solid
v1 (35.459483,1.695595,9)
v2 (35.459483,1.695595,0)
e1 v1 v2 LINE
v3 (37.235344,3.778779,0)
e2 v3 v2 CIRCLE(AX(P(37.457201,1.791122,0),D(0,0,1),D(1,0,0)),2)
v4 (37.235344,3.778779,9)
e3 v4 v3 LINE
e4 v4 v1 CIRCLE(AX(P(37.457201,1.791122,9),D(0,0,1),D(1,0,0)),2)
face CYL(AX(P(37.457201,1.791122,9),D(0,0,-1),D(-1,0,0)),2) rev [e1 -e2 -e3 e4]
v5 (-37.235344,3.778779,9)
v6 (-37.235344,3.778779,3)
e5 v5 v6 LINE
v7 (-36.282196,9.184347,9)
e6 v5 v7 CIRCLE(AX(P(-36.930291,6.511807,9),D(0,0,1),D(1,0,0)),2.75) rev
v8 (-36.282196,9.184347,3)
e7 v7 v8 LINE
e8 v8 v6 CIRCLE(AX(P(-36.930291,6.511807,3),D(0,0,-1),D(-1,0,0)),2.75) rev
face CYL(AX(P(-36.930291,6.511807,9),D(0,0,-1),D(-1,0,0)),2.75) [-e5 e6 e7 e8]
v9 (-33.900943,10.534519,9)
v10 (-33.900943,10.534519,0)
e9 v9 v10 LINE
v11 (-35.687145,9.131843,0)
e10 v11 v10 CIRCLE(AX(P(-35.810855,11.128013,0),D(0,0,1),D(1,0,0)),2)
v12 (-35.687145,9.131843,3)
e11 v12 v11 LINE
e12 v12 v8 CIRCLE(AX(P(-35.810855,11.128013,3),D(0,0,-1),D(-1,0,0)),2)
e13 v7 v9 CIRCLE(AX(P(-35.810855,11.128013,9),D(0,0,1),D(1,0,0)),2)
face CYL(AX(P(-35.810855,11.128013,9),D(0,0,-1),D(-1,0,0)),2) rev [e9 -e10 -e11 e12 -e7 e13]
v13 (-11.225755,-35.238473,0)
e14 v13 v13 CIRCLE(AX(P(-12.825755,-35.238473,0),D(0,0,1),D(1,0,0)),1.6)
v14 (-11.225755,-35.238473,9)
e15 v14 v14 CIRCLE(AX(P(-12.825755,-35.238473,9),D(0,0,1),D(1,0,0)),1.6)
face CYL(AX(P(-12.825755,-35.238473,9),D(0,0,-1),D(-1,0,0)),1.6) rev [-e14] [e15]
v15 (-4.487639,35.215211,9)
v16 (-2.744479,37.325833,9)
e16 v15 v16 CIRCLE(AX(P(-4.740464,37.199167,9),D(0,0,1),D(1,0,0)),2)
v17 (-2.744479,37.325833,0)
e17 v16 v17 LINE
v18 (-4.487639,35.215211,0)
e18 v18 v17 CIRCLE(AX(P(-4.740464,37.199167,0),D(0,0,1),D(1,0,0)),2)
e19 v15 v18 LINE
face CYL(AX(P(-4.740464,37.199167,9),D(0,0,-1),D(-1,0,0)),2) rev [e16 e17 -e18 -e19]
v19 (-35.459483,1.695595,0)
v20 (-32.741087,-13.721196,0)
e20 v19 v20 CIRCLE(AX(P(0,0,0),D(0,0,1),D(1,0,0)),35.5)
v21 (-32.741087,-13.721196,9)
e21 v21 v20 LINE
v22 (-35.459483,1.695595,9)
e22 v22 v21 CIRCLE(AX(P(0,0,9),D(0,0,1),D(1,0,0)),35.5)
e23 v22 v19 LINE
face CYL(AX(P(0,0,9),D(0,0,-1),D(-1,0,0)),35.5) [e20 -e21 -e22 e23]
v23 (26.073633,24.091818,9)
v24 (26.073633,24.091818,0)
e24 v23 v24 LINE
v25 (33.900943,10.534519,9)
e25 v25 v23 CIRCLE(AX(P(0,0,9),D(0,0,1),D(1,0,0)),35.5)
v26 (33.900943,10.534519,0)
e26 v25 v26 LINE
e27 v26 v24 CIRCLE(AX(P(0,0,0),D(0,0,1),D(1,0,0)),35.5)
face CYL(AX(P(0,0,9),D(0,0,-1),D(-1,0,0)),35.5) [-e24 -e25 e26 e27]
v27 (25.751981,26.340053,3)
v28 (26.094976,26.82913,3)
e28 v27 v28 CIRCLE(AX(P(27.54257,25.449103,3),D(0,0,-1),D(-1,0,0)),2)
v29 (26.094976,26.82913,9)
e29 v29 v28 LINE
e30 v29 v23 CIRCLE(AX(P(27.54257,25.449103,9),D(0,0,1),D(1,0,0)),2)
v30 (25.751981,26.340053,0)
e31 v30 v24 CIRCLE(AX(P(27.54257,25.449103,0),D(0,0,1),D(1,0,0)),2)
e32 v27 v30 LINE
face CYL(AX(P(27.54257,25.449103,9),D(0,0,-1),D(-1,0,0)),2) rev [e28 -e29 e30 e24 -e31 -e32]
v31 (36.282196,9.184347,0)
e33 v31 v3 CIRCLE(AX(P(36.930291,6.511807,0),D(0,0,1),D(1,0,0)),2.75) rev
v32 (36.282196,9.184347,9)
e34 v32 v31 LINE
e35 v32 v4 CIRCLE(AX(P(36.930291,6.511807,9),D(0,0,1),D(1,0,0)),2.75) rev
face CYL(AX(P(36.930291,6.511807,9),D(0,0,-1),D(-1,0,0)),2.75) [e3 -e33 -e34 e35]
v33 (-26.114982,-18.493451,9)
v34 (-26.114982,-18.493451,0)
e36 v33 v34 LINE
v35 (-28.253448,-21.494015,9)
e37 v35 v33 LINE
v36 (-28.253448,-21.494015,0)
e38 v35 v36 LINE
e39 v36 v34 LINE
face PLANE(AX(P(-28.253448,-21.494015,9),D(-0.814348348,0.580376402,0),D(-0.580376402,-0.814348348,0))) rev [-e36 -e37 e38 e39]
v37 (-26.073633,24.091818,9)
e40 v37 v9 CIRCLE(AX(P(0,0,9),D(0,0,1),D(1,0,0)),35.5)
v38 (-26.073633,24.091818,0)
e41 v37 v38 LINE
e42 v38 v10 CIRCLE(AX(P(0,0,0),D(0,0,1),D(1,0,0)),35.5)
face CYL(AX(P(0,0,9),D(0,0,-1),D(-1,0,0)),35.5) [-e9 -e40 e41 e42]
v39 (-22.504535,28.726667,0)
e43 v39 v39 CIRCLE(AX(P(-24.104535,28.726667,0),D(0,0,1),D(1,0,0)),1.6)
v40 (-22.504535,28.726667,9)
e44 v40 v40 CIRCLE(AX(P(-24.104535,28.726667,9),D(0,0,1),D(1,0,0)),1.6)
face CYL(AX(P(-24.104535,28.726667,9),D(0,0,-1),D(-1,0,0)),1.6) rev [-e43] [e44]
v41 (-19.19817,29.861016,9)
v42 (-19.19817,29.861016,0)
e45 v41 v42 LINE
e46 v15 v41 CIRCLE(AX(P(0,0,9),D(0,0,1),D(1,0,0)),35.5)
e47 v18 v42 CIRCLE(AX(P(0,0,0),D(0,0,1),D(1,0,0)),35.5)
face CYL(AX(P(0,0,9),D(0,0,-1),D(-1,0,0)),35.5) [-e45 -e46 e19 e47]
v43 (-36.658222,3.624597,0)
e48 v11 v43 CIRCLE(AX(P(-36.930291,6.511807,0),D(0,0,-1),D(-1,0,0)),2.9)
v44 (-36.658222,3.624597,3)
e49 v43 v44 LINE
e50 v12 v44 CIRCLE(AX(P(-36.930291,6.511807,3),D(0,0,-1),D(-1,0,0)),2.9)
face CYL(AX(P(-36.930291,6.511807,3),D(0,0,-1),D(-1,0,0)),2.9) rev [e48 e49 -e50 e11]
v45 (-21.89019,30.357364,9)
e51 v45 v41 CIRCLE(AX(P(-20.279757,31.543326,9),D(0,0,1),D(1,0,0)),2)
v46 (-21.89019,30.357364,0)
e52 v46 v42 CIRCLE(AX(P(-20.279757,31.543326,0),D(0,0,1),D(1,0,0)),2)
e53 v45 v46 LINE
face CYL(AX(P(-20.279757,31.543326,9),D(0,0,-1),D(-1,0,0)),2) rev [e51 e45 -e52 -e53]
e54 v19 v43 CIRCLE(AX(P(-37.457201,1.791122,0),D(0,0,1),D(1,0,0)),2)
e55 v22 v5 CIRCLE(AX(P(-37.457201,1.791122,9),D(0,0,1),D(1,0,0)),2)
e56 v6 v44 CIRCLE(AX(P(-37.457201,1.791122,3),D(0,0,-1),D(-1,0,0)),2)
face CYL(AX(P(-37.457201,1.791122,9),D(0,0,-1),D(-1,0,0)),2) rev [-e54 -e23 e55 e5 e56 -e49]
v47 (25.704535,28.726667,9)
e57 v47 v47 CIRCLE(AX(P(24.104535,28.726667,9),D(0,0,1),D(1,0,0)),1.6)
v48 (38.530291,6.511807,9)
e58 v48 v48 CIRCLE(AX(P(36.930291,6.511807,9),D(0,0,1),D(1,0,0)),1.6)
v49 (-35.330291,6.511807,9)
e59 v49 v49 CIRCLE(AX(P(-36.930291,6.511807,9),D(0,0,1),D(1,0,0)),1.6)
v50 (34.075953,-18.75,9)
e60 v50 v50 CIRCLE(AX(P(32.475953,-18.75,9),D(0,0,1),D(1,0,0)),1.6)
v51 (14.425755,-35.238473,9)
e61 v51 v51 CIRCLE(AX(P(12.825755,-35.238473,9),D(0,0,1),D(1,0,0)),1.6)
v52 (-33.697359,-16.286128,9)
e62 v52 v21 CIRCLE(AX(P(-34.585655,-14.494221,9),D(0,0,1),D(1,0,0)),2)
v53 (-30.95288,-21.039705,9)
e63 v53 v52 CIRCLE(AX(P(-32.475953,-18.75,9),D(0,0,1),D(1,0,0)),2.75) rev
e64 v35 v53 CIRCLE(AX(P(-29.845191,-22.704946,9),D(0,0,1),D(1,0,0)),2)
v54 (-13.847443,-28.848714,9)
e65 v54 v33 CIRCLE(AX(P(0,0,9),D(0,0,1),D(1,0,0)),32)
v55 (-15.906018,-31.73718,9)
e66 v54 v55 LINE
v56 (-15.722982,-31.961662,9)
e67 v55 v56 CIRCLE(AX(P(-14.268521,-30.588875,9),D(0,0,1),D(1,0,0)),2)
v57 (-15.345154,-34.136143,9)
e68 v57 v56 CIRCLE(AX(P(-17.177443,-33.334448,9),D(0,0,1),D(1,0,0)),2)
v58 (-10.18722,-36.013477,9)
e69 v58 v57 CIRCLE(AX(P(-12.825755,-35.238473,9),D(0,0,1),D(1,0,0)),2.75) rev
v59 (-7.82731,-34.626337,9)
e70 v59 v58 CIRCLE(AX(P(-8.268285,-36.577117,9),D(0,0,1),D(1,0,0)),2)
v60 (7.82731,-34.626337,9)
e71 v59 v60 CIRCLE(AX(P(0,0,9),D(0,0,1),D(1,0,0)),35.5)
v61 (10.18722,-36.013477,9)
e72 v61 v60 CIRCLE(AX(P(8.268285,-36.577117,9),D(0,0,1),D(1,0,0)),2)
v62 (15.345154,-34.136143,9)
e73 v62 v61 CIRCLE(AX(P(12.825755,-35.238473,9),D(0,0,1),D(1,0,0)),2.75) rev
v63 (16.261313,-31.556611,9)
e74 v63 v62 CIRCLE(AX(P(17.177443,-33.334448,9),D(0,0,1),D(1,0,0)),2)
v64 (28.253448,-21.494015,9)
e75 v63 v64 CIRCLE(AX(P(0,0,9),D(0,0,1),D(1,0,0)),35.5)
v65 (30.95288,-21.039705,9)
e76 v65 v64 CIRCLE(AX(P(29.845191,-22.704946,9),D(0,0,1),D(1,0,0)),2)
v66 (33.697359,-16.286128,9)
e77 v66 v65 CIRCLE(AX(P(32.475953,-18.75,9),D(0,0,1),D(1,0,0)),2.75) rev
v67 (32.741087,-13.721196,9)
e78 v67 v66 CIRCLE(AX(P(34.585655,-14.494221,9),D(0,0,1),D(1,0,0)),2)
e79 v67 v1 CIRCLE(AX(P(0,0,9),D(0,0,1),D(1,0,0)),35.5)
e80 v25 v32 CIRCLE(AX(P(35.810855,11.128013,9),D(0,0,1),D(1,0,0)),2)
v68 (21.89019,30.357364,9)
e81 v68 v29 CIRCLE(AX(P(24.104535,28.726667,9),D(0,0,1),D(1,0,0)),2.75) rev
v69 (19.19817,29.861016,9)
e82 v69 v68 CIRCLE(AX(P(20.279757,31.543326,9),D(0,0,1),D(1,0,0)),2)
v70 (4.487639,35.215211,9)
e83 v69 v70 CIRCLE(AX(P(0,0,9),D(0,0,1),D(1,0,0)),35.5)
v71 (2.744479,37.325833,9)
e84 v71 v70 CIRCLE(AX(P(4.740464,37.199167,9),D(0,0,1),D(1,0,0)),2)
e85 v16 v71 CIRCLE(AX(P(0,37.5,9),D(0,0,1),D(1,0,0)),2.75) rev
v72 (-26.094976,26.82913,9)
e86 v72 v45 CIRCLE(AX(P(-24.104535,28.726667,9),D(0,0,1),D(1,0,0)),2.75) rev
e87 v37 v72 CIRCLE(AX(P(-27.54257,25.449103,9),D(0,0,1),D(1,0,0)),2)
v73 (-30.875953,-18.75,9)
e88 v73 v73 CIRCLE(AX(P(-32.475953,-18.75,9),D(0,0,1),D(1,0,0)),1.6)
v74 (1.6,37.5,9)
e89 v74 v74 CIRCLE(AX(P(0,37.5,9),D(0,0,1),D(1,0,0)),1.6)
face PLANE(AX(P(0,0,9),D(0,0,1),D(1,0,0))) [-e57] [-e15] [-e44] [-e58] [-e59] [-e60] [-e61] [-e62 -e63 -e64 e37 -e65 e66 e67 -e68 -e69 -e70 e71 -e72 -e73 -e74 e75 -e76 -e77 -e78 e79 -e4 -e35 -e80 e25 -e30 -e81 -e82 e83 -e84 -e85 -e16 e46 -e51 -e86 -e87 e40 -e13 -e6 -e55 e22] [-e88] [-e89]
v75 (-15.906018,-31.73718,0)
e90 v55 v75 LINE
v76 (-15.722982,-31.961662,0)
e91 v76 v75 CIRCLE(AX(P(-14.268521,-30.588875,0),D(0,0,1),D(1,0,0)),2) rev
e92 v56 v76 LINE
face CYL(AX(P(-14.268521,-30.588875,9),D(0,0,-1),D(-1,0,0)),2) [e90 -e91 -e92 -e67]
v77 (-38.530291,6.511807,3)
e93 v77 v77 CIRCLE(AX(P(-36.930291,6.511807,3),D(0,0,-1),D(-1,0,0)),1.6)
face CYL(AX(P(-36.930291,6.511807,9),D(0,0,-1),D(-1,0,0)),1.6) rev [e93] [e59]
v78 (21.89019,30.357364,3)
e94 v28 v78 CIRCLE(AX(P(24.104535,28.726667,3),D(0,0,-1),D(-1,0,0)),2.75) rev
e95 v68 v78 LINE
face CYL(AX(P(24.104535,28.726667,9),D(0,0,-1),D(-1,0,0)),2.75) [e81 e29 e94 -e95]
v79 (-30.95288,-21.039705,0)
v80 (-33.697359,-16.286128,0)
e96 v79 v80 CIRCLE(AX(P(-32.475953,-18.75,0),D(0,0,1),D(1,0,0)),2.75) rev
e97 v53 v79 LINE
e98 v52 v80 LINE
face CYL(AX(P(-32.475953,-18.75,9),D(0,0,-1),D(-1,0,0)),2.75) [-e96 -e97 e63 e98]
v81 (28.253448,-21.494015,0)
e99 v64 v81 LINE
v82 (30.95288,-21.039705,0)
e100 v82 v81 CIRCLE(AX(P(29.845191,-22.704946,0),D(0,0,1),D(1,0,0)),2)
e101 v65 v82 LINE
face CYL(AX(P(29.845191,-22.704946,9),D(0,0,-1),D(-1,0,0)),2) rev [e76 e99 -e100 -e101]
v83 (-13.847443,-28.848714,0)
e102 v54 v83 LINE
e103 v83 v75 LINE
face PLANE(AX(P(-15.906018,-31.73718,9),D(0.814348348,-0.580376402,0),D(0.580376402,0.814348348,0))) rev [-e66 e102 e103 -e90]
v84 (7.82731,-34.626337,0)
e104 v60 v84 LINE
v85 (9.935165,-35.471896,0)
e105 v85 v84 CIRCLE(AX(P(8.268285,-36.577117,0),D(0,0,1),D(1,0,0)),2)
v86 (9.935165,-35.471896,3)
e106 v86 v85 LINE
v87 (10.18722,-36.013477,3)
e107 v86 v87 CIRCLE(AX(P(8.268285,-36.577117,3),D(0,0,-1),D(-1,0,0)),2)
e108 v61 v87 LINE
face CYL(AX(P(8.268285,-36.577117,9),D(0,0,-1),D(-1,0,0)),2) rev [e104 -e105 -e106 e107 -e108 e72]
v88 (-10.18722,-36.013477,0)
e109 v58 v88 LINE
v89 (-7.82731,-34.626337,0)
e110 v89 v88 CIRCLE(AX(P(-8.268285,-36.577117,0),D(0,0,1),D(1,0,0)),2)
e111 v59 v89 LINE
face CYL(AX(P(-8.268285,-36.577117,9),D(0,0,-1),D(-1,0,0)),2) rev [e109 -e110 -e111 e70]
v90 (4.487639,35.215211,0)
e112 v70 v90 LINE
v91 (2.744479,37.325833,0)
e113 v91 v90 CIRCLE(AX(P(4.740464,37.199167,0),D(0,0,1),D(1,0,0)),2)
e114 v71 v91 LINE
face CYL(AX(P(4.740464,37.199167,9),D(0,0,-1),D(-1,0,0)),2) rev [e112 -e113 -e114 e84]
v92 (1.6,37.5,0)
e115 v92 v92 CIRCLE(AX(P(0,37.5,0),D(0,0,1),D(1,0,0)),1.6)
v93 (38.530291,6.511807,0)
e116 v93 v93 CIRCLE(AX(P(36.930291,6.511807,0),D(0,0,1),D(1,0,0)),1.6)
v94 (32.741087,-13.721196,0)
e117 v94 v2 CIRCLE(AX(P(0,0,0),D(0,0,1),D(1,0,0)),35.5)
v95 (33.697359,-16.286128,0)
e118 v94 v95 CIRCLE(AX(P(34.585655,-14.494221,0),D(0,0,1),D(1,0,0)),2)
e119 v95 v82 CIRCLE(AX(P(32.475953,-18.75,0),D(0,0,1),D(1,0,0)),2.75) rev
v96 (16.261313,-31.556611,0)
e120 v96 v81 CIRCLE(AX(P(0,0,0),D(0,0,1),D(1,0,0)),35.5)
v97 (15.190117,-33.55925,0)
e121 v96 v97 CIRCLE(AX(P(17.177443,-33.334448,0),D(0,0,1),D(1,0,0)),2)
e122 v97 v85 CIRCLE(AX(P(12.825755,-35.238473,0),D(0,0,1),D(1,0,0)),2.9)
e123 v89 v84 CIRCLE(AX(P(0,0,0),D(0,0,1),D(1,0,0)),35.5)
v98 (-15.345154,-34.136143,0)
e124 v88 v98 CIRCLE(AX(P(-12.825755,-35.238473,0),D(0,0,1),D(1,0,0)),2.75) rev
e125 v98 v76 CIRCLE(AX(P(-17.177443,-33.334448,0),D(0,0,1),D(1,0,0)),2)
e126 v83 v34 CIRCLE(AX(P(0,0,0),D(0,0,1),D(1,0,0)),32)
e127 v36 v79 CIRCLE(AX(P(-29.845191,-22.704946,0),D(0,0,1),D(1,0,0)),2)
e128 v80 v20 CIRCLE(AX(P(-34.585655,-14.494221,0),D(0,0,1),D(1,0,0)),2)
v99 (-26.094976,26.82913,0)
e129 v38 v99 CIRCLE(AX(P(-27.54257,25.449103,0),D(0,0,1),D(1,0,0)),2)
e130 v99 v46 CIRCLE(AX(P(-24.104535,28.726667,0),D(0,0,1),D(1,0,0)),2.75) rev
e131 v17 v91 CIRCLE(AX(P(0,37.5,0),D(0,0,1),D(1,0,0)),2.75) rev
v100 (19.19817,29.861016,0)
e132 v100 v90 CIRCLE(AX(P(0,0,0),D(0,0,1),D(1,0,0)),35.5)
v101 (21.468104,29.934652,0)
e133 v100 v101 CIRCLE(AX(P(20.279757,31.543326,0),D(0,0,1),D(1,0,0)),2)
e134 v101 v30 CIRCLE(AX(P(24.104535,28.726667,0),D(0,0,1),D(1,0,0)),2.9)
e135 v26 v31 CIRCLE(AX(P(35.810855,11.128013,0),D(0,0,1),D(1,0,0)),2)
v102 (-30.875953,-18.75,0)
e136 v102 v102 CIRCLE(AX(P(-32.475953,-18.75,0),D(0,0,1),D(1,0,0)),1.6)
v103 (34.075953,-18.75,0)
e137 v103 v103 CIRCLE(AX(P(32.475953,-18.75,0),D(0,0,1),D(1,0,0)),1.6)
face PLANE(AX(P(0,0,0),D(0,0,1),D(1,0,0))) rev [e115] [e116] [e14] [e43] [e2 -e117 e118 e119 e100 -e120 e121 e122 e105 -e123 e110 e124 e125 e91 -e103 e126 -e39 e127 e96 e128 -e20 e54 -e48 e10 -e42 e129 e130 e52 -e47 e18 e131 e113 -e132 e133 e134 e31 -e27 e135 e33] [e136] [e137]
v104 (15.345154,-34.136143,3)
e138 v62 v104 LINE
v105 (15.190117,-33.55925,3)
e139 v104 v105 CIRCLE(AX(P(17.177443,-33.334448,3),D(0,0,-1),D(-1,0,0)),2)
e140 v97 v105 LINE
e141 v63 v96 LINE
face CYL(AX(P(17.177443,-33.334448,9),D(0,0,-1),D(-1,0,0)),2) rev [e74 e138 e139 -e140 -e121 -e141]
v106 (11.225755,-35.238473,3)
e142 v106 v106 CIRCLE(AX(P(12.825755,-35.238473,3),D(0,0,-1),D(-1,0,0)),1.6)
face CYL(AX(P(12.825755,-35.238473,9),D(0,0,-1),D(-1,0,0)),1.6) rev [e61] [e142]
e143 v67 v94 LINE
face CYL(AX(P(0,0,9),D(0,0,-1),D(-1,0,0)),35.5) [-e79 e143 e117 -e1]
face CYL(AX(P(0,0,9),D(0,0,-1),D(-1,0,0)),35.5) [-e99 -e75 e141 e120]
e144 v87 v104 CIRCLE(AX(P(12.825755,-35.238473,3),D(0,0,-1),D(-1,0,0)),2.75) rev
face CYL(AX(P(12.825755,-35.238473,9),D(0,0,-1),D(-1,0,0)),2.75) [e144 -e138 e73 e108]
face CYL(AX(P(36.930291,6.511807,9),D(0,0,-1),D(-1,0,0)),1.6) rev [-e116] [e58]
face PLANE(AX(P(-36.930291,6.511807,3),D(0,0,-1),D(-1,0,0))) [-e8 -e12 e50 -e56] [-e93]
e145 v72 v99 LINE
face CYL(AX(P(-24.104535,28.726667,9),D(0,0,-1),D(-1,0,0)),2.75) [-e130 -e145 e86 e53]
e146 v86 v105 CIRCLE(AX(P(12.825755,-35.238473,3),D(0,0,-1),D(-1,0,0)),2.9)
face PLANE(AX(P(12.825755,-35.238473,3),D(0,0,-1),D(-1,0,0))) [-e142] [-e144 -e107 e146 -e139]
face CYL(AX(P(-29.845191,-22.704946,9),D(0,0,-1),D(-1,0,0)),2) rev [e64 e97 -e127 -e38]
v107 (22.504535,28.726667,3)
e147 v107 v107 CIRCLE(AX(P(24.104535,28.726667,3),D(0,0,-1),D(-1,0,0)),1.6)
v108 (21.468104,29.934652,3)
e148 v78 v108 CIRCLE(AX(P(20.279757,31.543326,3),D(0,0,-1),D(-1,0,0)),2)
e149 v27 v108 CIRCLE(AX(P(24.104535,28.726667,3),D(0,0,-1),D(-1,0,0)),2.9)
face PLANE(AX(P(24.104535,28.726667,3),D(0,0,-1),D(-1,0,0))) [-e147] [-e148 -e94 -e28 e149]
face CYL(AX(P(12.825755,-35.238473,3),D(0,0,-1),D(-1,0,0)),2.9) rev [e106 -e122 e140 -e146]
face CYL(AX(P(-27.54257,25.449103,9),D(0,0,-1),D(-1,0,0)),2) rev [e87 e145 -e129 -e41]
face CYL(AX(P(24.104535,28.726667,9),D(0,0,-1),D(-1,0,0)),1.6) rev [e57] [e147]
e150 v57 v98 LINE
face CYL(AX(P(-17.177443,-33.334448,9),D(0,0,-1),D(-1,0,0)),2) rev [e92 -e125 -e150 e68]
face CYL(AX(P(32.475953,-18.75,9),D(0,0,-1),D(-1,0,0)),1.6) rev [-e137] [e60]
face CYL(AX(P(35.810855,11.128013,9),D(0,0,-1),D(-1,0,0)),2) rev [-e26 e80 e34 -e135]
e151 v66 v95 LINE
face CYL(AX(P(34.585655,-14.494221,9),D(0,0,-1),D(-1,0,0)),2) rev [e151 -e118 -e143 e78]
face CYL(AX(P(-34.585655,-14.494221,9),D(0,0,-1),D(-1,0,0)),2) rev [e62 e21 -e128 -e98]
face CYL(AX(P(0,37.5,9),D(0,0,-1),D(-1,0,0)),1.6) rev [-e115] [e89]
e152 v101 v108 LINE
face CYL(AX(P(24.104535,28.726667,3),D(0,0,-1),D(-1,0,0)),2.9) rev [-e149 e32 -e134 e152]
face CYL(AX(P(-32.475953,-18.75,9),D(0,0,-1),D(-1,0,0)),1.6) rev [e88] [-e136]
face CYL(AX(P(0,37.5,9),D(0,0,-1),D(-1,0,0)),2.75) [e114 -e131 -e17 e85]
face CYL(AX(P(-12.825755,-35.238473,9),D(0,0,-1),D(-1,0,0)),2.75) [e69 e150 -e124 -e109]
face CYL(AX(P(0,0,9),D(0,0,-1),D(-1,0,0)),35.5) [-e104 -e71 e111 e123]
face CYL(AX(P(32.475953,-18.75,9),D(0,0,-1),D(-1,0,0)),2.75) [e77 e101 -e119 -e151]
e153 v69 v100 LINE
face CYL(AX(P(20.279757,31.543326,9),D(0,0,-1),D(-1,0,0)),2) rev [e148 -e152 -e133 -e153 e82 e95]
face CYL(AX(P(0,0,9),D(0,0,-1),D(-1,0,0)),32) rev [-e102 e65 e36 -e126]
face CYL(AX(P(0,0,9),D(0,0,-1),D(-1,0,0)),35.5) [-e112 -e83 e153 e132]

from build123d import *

# Parameters (mm, degrees)
SKETCH_1_R          = 35.5
SKETCH_1_R_2        = 32
SKETCH_1_R_3        = 1.6
EXTRUDE_1_DEPTH     = 9
SKETCH_2_R          = 2.9
CUT_EXTRUDE_1_DEPTH = 3
CUT_EXTRUDE_3_DEPTH = 58.232752625
FILLET_START        = -1
FILLET_1_DEPTH      = 11


with BuildPart() as part:
    # 草图1 → 凸台-拉伸1 (new body)
    # profile 1 of 10: a face of its own
    with BuildSketch(Plane.XY):
        Circle(SKETCH_1_R)
        Circle(SKETCH_1_R_2, mode=Mode.SUBTRACT)
    # profile 2 of 10: a face of its own
    with BuildSketch(Plane.XY):
        with BuildLine():
            ThreePointArc((-26.073632516, 24.091817852), (-22.818960144, 27.194577731), (-19.198170234, 29.861015717))
            ThreePointArc((-19.198170234, 29.861015717), (-20.642400342, 29.576478726), (-21.890190162, 30.357364422))
            ThreePointArc((-21.890190162, 30.357364422), (-25.87220129, 30.833288836), (-26.094976213, 26.829129998))
            ThreePointArc((-26.094976213, 26.829129998), (-25.542630354, 25.46469753), (-26.073632516, 24.091817852))
        make_face()
        with Locations((-24.104535363, 28.726666617)):
            Circle(SKETCH_1_R_3, mode=Mode.SUBTRACT)
    # profile 3 of 10: a face of its own
    with BuildSketch(Plane.XY):
        with BuildLine():
            ThreePointArc((-4.48763929, 35.215211111), (0, 35.5), (4.48763929, 35.215211111))
            ThreePointArc((4.48763929, 35.215211111), (3.198397989, 35.925576349), (2.744479181, 37.325833333))
            ThreePointArc((2.744479181, 37.325833333), (0, 40.25), (-2.744479181, 37.325833333))
            ThreePointArc((-2.744479181, 37.325833333), (-3.198397989, 35.925576349), (-4.48763929, 35.215211111))
        make_face()
        with Locations((0, 37.5)):
            Circle(SKETCH_1_R_3, mode=Mode.SUBTRACT)
    # profile 4 of 10: a face of its own
    with BuildSketch(Plane.XY):
        with BuildLine():
            ThreePointArc((19.198170234, 29.861015717), (22.818960144, 27.194577731), (26.073632516, 24.091817852))
            ThreePointArc((26.073632516, 24.091817852), (25.542630354, 25.46469753), (26.094976213, 26.829129998))
            ThreePointArc((26.094976213, 26.829129998), (25.87220129, 30.833288836), (21.890190162, 30.357364422))
            ThreePointArc((21.890190162, 30.357364422), (20.642400342, 29.576478726), (19.198170234, 29.861015717))
        make_face()
        with Locations((24.104535363, 28.726666617)):
            Circle(SKETCH_1_R_3, mode=Mode.SUBTRACT)
    # profile 5 of 10: a face of its own
    with BuildSketch(Plane.XY):
        with BuildLine():
            ThreePointArc((33.900942541, 10.534519201), (34.960675232, 6.164510307), (35.459483311, 1.69559527))
            ThreePointArc((35.459483311, 1.69559527), (35.935182102, 3.088603728), (37.235343863, 3.778778563))
            ThreePointArc((37.235343863, 3.778778563), (39.638512059, 6.989339151), (36.282196246, 9.184347313))
            ThreePointArc((36.282196246, 9.184347313), (34.824390138, 9.388218001), (33.900942541, 10.534519201))
        make_face()
        with Locations((36.930290738, 6.511806663)):
            Circle(SKETCH_1_R_3, mode=Mode.SUBTRACT)
    # profile 6 of 10: a face of its own
    with BuildSketch(Plane.XY):
        with BuildLine():
            ThreePointArc((33.697359474, -16.286127976), (32.711660758, -15.192894265), (32.741087067, -13.721195927))
            ThreePointArc((32.741087067, -13.721195927), (30.743901834, -17.75), (28.253447777, -21.494015184))
            ThreePointArc((28.253447777, -21.494015184), (29.51326277, -20.732682084), (30.952880294, -21.039705357))
            ThreePointArc((30.952880294, -21.039705357), (34.857522502, -20.125), (33.697359474, -16.286127976))
        make_face()
        with Locations((32.475952642, -18.75)):
            Circle(SKETCH_1_R_3, mode=Mode.SUBTRACT)
    # profile 7 of 10: a face of its own
    with BuildSketch(Plane.XY):
        with BuildLine():
            ThreePointArc((15.3451537, -34.136142985), (15.29278176, -32.665082454), (16.261313077, -31.556610987))
            ThreePointArc((16.261313077, -31.556610987), (12.141715088, -33.359088038), (7.827310026, -34.626337054))
            ThreePointArc((7.827310026, -34.626337054), (9.281759784, -34.852915531), (10.187220033, -36.013477311))
            ThreePointArc((10.187220033, -36.013477311), (13.766310769, -37.822627987), (15.3451537, -34.136142985))
        make_face()
        with Locations((12.825755375, -35.238473279)):
            Circle(SKETCH_1_R_3, mode=Mode.SUBTRACT)
    # profile 8 of 10: a face of its own
    with BuildSketch(Plane.XY):
        with BuildLine():
            ThreePointArc((-10.187220033, -36.013477311), (-9.281759784, -34.852915531), (-7.827310026, -34.626337054))
            ThreePointArc((-7.827310026, -34.626337054), (-12.141715088, -33.359088038), (-16.261313077, -31.556610987))
            ThreePointArc((-16.261313077, -31.556610987), (-15.29278176, -32.665082454), (-15.3451537, -34.136142985))
            ThreePointArc((-15.3451537, -34.136142985), (-13.766310769, -37.822627987), (-10.187220033, -36.013477311))
        make_face()
        with Locations((-12.825755375, -35.238473279)):
            Circle(SKETCH_1_R_3, mode=Mode.SUBTRACT)
    # profile 9 of 10: a face of its own
    with BuildSketch(Plane.XY):
        with BuildLine():
            ThreePointArc((-30.952880294, -21.039705357), (-29.51326277, -20.732682084), (-28.253447777, -21.494015184))
            ThreePointArc((-28.253447777, -21.494015184), (-30.743901834, -17.75), (-32.741087067, -13.721195927))
            ThreePointArc((-32.741087067, -13.721195927), (-32.711660758, -15.192894265), (-33.697359474, -16.286127976))
            ThreePointArc((-33.697359474, -16.286127976), (-34.857522502, -20.125), (-30.952880294, -21.039705357))
        make_face()
        with Locations((-32.475952642, -18.75)):
            Circle(SKETCH_1_R_3, mode=Mode.SUBTRACT)
    # profile 10 of 10: a face of its own
    with BuildSketch(Plane.XY):
        with BuildLine():
            ThreePointArc((-35.459483311, 1.69559527), (-34.960675232, 6.164510307), (-33.900942541, 10.534519201))
            ThreePointArc((-33.900942541, 10.534519201), (-34.824390138, 9.388218001), (-36.282196246, 9.184347313))
            ThreePointArc((-36.282196246, 9.184347313), (-39.638512059, 6.989339151), (-37.235343863, 3.778778563))
            ThreePointArc((-37.235343863, 3.778778563), (-35.935182102, 3.088603728), (-35.459483311, 1.69559527))
        make_face()
        with Locations((-36.930290738, 6.511806663)):
            Circle(SKETCH_1_R_3, mode=Mode.SUBTRACT)
    extrude(amount=EXTRUDE_1_DEPTH)

    # 草图2 → 切除-拉伸1 (cut)
    with BuildSketch(Plane(origin=(0, 0, 0), x_dir=(-1, 0, 0), z_dir=(0, 0, -1))):
        with Locations((36.930290738, 6.511806663)):
            Circle(SKETCH_2_R)
        with Locations((-12.825755375, -35.238473279)):
            Circle(SKETCH_2_R)
        with Locations((-24.104535363, 28.726666617)):
            Circle(SKETCH_2_R)
    extrude(amount=-CUT_EXTRUDE_1_DEPTH, mode=Mode.SUBTRACT)

    # 草图4 → 切除-拉伸3 (cut, through all)
    with BuildSketch(Plane(origin=(0, 0, 0), x_dir=(-1, 0, 0), z_dir=(0, 0, -1))):
        with BuildLine():
            Line((15.906018141, -31.737179883), (13.847443054, -28.848714371))
            ThreePointArc((13.847443054, -28.848714371), (20.641141261, -24.45287892), (26.114981508, -18.493451297))
            Line((26.114981508, -18.493451297), (28.253447777, -21.494015184))
            ThreePointArc((28.253447777, -21.494015184), (22.665948321, -27.322239782), (15.906018141, -31.737179883))
        make_face()
    extrude(amount=-CUT_EXTRUDE_3_DEPTH, mode=Mode.SUBTRACT)

    # 圆角1: read off the stored shape, not the designer's step
    # 圆角1 outline → 圆角1 (cut)
    with BuildSketch(Plane.XY.offset(FILLET_START)):
        with BuildLine():
            ThreePointArc((-16.261313077, -31.556610987), (-15.974969952, -31.736306296), (-15.722982331, -31.961661634))
            ThreePointArc((-15.722982331, -31.961661634), (-15.818569327, -31.852738575), (-15.906018141, -31.737179883))
            ThreePointArc((-15.906018141, -31.737179883), (-16.083919009, -31.647394036), (-16.261313077, -31.556610987))
        make_face()
    extrude(amount=FILLET_1_DEPTH, mode=Mode.SUBTRACT)


solid = part.part
